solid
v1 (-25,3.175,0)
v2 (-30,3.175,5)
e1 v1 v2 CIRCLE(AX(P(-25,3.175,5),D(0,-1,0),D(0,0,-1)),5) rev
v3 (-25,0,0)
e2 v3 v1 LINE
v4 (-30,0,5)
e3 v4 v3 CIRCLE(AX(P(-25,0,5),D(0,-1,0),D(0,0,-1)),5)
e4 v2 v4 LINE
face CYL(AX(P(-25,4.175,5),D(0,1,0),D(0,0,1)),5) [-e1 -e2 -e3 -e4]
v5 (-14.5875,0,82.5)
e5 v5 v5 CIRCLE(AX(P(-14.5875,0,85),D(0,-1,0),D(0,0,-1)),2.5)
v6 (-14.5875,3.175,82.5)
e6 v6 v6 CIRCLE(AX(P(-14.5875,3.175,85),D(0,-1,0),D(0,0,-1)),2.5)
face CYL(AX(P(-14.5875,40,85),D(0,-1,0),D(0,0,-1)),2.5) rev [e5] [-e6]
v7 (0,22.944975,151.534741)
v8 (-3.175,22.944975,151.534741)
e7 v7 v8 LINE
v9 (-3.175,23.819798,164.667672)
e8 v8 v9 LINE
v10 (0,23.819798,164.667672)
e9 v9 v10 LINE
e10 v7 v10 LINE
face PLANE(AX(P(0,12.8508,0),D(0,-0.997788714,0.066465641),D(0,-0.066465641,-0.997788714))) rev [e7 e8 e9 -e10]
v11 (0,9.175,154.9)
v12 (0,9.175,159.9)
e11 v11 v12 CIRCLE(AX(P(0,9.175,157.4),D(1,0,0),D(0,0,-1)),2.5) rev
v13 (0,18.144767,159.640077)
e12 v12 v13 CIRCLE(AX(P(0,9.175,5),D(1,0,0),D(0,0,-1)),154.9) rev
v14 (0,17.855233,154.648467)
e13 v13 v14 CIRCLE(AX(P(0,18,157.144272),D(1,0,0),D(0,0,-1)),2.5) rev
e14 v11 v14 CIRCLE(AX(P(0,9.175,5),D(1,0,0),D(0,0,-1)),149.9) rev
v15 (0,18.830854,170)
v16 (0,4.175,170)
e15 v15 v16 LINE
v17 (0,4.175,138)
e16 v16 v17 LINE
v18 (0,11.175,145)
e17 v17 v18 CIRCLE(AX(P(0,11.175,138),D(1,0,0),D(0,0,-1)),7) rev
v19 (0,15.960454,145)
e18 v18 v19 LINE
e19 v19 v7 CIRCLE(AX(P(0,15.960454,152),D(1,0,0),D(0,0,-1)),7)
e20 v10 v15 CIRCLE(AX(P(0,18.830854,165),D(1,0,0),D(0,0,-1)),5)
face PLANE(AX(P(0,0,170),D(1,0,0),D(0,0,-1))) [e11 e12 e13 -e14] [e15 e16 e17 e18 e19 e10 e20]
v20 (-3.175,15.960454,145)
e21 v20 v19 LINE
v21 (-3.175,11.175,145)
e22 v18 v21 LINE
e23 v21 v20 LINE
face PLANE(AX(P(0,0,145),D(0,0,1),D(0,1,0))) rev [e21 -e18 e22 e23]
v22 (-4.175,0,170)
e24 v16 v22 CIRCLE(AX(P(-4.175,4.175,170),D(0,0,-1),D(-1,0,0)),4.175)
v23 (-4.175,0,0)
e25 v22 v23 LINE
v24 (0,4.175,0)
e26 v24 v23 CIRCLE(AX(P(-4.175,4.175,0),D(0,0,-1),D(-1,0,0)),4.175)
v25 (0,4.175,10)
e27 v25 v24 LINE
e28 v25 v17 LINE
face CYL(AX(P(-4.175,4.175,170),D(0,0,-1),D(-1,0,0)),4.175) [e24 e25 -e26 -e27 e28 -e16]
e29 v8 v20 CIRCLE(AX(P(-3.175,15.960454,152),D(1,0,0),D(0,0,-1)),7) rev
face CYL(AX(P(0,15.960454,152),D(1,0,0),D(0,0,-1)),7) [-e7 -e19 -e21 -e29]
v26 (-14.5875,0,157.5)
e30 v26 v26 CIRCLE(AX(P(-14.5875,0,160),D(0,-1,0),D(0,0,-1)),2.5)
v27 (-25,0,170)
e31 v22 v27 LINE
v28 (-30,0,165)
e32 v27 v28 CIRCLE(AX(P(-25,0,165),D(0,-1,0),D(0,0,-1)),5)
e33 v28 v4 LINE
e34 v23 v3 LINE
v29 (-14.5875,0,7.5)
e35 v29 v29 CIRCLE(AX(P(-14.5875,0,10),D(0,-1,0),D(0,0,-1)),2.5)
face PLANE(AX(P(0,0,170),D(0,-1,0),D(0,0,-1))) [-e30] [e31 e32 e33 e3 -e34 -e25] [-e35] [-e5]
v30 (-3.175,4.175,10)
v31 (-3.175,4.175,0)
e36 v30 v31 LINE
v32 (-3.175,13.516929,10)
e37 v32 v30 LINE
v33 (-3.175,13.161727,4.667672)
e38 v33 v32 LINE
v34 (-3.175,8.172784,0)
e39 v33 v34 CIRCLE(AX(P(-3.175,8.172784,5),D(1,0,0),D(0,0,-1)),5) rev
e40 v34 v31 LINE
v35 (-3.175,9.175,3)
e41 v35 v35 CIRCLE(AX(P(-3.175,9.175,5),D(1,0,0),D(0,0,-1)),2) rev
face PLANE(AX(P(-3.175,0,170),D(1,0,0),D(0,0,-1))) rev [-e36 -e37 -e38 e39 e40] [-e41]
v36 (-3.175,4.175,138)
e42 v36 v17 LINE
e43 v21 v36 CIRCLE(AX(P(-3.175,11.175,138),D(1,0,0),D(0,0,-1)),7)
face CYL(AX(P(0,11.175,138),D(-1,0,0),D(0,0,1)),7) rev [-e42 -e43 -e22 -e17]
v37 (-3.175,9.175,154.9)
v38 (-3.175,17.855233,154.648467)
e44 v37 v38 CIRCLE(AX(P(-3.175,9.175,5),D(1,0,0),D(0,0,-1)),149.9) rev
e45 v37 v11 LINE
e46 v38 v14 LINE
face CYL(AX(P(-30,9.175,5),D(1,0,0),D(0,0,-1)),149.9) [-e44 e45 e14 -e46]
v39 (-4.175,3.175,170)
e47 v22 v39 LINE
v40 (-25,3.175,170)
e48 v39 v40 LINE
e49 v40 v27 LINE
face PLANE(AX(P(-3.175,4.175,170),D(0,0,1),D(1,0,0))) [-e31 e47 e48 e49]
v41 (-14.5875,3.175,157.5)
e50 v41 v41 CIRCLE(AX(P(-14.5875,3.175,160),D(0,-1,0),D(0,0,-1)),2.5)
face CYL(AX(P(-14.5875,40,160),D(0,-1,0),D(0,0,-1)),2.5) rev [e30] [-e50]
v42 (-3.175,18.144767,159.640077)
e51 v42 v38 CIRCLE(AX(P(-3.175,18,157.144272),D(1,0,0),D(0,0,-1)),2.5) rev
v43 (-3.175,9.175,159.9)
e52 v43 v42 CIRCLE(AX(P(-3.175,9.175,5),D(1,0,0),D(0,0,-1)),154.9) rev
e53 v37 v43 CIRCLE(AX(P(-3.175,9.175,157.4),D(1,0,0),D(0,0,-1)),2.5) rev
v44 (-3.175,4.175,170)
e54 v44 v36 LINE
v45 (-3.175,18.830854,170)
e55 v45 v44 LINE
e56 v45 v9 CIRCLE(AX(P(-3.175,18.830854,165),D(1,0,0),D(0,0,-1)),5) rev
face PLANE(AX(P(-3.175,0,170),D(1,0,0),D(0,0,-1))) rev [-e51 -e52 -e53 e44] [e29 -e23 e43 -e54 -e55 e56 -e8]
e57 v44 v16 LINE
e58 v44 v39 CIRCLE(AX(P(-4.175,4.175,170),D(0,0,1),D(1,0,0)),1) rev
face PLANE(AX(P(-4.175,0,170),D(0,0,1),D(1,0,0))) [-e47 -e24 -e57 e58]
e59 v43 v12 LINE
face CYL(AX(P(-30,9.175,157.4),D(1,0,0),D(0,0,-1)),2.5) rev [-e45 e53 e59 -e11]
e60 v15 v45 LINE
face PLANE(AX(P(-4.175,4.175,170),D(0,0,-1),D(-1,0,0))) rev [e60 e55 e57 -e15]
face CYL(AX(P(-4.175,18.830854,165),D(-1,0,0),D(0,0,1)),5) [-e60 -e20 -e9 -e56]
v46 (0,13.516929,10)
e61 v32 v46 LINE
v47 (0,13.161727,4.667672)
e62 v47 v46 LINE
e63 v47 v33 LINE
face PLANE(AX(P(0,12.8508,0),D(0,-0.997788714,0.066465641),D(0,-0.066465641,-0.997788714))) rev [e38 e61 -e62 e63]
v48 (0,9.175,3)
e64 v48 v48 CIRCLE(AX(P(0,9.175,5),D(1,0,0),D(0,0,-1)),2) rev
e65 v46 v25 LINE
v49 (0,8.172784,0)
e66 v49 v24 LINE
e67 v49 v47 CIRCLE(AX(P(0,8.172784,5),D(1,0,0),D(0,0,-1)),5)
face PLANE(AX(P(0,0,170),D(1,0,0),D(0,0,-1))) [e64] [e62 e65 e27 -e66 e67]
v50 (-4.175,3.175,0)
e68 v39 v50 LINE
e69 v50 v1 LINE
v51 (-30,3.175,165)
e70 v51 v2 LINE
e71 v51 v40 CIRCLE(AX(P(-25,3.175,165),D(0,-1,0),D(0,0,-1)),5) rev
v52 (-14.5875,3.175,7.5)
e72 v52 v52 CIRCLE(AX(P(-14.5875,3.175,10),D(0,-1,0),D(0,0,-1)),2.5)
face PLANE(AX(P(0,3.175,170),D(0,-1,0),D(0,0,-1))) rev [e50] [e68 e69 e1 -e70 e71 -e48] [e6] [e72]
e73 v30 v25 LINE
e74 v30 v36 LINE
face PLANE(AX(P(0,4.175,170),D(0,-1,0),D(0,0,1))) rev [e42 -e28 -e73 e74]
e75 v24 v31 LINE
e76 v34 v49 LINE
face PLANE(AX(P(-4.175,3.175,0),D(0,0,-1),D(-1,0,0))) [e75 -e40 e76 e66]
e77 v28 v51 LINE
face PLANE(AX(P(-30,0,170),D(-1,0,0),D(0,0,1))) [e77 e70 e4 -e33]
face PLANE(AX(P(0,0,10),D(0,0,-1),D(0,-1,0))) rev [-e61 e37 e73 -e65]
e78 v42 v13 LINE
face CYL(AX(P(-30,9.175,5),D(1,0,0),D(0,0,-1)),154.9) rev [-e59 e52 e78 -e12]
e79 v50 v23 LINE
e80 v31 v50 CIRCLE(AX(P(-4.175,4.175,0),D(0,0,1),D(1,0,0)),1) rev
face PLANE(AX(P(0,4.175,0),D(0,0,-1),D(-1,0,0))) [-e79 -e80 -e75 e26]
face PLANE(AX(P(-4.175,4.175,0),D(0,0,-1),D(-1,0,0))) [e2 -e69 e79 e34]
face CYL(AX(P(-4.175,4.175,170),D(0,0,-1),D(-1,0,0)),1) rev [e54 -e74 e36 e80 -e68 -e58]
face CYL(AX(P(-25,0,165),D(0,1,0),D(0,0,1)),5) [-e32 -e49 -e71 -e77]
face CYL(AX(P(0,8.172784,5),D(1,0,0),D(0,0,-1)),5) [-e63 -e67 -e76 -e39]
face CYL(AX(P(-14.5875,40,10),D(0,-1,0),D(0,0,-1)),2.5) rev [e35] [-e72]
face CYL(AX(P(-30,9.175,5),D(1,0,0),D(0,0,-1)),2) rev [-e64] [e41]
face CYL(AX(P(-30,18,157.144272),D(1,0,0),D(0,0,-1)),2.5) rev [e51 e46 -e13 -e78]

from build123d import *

# Parameters (mm, degrees)
BASE_FLANGE1_DEPTH = 170
FILLET1_R          = 5
SKETCH6_R          = 2
CUT_EXTRUDE1_DEPTH = 178.200451467
SKETCH7_R          = 2.5
CUT_EXTRUDE2_DEPTH = 178.200451467
CUT_EXTRUDE3_DEPTH = 177.690635363
FILLET2_R          = 5
CUT_EXTRUDE4_DEPTH = 175.263907966
FILLET3_R          = 7


# Sheet-metal steps are written as plain solids
with BuildPart() as part:
    # Sketch1 → Base-Flange1 (new body)
    with BuildSketch(Plane.XY):
        with BuildLine():
            Line((0, 40), (0, 4.175))
            ThreePointArc((0, 4.175), (-1.222829189, 1.222829189), (-4.175, 0))
            Line((-4.175, 0), (-30, 0))
            Line((-30, 0), (-30, 3.175))
            Line((-30, 3.175), (-4.175, 3.175))
            ThreePointArc((-4.175, 3.175), (-3.467893219, 3.467893219), (-3.175, 4.175))
            Line((-3.175, 4.175), (-3.175, 40))
            Line((-3.175, 40), (0, 40))
        make_face()
    extrude(amount=BASE_FLANGE1_DEPTH)

    # Fillet1
    fillet1_edges = [part.edges().sort_by_distance(p)[0] for p in [
        (-1.5875, 40, 170),
        (-1.5875, 40, 0),
        (-30, 1.5875, 170),
        (-30, 1.5875, 0),
    ]]
    fillet(fillet1_edges, radius=FILLET1_R)

    # Sketch6 → Cut-Extrude1 (cut, through all)
    with BuildSketch(Plane.ZY):
        with BuildLine():
            ThreePointArc((159.640076561, 18.14476706), (156.999504521, 20.49580498), (154.648466601, 17.85523294))
            ThreePointArc((154.648466601, 17.85523294), (154.837103455, 13.516938304), (154.9, 9.175))
            ThreePointArc((154.9, 9.175), (157.4, 6.675), (159.9, 9.175))
            ThreePointArc((159.9, 9.175), (159.835005505, 13.661766133), (159.640076561, 18.14476706))
        make_face()
        with Locations(Location((5, 9.175, 0), (0, 0, 180))):
            Circle(SKETCH6_R)
    extrude(amount=CUT_EXTRUDE1_DEPTH, mode=Mode.SUBTRACT)

    # Sketch7 → Cut-Extrude2 (cut, through all)
    with BuildSketch(Plane.XZ):
        with Locations(Location((-14.5875, 160, 0), (0, 0, 270))):
            Circle(SKETCH7_R)
        with Locations(Location((-14.5875, 85, 0), (0, 0, 270))):
            Circle(SKETCH7_R)
        with Locations(Location((-14.5875, 10, 0), (0, 0, 270))):
            Circle(SKETCH7_R)
    extrude(amount=-CUT_EXTRUDE2_DEPTH, mode=Mode.SUBTRACT)

    # Sketch8 → Cut-Extrude3 (cut, through all)
    with BuildSketch(Plane.ZY.offset(3.175)):
        with BuildLine():
            Line((0, 12.85080004), (170, 24.175))
            Line((170, 24.175), (170, 35))
            ThreePointArc((170, 35), (168.535533906, 38.535533906), (165, 40))
            Line((165, 40), (5, 40))
            ThreePointArc((5, 40), (1.464466094, 38.535533906), (0, 35))
            Line((0, 35), (0, 12.85080004))
        make_face()
    extrude(amount=-CUT_EXTRUDE3_DEPTH, mode=Mode.SUBTRACT)

    # Fillet2
    fillet2_edges = [part.edges().sort_by_distance(p)[0] for p in [
        (-1.5875, 24.175, 170),
        (-1.5875, 12.85080004, 0),
    ]]
    fillet(fillet2_edges, radius=FILLET2_R)

    # Sketch9 → Cut-Extrude4 (cut, through all)
    with BuildSketch(Plane(origin=(0, 0, 0), x_dir=(0, 0, -1), z_dir=(1, 0, 0))):
        Polygon((-10, 13.51692945), (-145, 22.509676476), (-145, 4.175), (-10, 4.175), align=None)
    extrude(amount=-CUT_EXTRUDE4_DEPTH, mode=Mode.SUBTRACT)

    # Fillet3
    fillet3_edges = [part.edges().sort_by_distance(p)[0] for p in [
        (-1.5875, 4.175, 145),
        (-1.5875, 22.509676476, 145),
    ]]
    fillet(fillet3_edges, radius=FILLET3_R)


solid = part.part
